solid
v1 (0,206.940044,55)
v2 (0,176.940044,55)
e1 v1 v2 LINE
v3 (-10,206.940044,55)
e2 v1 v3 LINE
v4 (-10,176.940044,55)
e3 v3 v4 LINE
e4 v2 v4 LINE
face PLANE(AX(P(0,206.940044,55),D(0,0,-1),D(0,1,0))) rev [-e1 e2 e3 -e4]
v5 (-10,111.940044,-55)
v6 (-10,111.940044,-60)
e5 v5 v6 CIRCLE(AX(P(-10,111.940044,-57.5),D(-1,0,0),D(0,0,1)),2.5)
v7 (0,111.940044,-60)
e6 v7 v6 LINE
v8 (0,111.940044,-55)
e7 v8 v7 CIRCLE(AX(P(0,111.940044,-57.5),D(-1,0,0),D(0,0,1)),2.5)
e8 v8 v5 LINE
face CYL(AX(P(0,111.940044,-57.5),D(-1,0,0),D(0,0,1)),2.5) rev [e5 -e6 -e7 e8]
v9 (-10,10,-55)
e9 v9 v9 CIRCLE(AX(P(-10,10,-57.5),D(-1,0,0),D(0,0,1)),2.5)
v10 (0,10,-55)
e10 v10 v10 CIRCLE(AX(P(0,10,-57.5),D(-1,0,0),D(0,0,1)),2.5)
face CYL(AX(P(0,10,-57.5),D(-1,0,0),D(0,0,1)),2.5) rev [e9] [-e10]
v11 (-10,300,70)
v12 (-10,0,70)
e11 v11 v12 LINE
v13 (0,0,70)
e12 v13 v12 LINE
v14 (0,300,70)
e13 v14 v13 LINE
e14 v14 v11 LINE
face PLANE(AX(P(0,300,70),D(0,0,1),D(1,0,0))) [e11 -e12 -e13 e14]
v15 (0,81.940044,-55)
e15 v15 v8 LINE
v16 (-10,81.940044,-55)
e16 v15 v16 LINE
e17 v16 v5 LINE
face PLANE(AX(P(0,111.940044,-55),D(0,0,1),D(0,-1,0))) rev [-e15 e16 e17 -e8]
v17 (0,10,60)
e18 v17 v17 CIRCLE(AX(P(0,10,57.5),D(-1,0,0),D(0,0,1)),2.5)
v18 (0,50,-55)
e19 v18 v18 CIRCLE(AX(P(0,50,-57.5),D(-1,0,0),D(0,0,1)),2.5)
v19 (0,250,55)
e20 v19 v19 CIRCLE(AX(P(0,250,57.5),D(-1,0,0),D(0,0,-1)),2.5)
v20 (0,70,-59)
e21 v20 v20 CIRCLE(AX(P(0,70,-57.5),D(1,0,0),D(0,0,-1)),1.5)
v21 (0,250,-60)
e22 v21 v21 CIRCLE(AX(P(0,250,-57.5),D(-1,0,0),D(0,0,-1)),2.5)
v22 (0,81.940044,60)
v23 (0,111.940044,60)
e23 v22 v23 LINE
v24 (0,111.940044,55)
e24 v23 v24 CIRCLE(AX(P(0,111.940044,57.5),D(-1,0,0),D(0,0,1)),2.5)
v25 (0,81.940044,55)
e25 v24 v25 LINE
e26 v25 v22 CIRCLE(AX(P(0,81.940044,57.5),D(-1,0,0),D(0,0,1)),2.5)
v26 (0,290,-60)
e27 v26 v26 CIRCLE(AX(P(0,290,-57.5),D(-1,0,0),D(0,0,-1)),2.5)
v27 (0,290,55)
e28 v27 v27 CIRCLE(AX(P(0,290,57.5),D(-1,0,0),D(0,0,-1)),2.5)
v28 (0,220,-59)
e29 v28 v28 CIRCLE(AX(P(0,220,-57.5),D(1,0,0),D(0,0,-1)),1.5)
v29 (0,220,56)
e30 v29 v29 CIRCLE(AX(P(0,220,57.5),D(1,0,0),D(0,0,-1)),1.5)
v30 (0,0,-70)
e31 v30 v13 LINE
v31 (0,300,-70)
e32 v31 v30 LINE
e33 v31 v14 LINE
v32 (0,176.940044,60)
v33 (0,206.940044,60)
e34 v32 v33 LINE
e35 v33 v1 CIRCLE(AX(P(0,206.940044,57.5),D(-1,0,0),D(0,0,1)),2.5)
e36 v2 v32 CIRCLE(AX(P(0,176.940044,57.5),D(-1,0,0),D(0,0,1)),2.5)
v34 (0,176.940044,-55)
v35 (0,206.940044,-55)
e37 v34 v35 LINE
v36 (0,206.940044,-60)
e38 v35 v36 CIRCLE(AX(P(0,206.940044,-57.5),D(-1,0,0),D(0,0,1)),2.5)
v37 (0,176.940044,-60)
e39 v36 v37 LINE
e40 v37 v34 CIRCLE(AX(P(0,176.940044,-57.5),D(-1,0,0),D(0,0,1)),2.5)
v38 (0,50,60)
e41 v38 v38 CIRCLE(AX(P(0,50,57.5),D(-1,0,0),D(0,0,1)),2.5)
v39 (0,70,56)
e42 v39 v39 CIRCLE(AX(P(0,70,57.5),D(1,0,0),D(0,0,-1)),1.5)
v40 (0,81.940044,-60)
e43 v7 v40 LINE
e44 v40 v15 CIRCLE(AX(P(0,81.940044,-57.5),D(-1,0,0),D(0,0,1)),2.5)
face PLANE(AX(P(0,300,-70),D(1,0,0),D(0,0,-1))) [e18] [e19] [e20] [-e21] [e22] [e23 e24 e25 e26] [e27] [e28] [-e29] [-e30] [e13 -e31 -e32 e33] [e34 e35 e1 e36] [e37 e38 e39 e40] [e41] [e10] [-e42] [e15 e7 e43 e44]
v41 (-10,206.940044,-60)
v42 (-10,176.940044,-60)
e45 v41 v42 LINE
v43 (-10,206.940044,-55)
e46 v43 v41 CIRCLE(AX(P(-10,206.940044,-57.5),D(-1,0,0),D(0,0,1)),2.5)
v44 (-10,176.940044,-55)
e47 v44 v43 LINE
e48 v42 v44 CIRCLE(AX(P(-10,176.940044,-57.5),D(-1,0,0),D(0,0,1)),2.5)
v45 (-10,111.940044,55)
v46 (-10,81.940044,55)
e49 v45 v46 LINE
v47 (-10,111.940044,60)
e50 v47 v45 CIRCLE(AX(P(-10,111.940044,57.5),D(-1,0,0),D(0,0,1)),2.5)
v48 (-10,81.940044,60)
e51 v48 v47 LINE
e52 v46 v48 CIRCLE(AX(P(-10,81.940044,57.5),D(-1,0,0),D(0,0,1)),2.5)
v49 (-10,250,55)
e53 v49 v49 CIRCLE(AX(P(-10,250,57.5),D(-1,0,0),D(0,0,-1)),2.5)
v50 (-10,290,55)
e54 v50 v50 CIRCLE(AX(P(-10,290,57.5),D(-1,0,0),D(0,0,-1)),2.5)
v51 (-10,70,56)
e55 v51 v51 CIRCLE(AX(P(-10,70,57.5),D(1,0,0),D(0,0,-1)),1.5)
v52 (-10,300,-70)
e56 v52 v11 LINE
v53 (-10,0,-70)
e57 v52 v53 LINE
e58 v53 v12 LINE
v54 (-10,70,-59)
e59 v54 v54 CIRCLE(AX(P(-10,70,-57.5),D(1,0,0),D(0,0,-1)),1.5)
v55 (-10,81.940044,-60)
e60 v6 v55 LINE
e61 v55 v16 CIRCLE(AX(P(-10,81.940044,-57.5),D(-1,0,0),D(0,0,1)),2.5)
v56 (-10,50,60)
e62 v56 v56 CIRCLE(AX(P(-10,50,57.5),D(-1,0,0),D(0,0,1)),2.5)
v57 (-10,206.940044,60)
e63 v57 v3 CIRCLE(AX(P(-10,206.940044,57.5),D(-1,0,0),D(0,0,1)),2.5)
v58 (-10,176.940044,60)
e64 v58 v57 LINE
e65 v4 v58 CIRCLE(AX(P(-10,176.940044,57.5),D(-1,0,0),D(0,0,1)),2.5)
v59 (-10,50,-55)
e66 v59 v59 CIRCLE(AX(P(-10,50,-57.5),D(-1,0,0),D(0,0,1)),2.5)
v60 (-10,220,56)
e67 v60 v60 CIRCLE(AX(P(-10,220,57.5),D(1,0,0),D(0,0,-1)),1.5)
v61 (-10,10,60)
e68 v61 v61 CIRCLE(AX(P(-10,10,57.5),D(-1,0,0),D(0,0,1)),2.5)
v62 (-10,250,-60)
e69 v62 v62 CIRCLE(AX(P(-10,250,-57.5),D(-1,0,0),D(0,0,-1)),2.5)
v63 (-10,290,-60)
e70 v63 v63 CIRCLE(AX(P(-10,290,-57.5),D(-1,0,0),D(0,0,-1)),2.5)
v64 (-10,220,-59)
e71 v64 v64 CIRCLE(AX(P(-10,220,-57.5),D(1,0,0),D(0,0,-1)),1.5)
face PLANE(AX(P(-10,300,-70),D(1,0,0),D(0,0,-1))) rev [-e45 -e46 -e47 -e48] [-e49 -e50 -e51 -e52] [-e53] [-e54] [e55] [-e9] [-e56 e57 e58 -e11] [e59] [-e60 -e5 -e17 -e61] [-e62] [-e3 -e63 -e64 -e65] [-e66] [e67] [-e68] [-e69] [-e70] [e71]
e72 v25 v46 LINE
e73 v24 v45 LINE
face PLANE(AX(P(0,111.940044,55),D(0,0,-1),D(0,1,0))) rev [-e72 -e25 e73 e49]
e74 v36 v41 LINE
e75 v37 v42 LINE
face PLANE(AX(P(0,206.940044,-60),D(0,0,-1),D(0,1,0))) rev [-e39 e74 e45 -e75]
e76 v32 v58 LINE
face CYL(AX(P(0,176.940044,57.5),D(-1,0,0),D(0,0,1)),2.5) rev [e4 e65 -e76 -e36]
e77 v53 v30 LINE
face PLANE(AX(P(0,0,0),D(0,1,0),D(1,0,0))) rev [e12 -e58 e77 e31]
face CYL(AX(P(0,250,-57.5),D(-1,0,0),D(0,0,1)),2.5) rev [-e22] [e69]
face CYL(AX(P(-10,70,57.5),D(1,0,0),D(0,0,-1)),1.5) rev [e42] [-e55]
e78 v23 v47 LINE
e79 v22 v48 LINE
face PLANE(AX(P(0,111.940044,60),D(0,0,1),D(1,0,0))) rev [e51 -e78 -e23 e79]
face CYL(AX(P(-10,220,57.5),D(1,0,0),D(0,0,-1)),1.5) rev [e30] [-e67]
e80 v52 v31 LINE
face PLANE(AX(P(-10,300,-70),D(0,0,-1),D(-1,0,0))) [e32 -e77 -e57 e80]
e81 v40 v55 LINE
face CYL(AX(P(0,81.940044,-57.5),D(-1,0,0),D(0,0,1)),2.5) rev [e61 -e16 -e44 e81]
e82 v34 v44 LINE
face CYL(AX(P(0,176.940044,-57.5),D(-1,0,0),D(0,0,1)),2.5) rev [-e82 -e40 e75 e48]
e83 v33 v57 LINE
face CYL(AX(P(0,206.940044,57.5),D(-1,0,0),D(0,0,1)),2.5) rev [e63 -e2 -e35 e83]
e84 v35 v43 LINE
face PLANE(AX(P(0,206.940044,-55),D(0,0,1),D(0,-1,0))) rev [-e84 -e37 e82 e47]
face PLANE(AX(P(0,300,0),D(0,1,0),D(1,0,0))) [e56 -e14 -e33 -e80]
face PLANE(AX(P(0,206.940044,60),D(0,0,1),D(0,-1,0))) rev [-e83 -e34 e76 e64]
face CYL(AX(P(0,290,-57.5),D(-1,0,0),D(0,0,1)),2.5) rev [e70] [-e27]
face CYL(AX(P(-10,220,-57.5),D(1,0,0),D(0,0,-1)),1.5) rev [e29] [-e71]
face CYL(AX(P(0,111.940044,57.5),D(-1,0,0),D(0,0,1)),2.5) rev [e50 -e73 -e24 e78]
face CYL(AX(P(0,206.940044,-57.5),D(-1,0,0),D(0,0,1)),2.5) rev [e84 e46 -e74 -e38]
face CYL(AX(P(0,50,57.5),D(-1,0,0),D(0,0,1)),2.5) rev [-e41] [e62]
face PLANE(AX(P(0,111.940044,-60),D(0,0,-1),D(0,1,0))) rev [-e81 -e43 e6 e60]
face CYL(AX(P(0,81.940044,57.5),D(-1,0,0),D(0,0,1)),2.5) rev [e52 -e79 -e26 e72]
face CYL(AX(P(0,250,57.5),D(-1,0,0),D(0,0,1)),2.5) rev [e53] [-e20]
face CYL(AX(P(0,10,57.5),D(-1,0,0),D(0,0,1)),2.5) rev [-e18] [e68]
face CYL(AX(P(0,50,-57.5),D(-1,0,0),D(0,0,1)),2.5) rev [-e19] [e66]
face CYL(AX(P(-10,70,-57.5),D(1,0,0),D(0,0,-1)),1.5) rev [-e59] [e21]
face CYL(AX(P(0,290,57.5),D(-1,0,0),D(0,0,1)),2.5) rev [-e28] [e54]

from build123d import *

# Parameters (mm, degrees)
BASE_FLANGE1_OUTLINE_W = 10
BASE_FLANGE1_OUTLINE_H = 140
BASE_FLANGE1_DEPTH     = 300
SKETCH6_R              = 2.5
CUT_EXTRUDE1_DEPTH     = 10
SKETCH11_R             = 1.5
CUT_EXTRUDE2_DEPTH     = 10
CUT_EXTRUDE3_DEPTH     = 10


# Read off the part's stored shape, not the designer's step: Base-Flange1
with BuildPart() as part:
    # Base-Flange1 outline → Base-Flange1 (new body)
    with BuildSketch(Plane(origin=(0, 0, 0), x_dir=(1, 0, 0), z_dir=(0, 1, 0))):
        with Locations((-5, 0)):
            Rectangle(BASE_FLANGE1_OUTLINE_W, BASE_FLANGE1_OUTLINE_H)
    extrude(amount=BASE_FLANGE1_DEPTH)

    # Sketch6 → Cut-Extrude1 (cut)
    with BuildSketch(Plane.ZY.offset(10)):
        with Locations((57.5, 10)):
            Circle(SKETCH6_R)
        with Locations((-57.5, 10)):
            Circle(SKETCH6_R)
        with Locations((-57.5, 50)):
            Circle(SKETCH6_R)
        with Locations((57.5, 50)):
            Circle(SKETCH6_R)
        with Locations(Location((57.5, 250, 0), (0, 0, 180))):
            Circle(SKETCH6_R)
        with Locations(Location((-57.5, 250, 0), (0, 0, 180))):
            Circle(SKETCH6_R)
        with Locations(Location((-57.5, 290, 0), (0, 0, 180))):
            Circle(SKETCH6_R)
        with Locations(Location((57.5, 290, 0), (0, 0, 180))):
            Circle(SKETCH6_R)
    extrude(amount=-CUT_EXTRUDE1_DEPTH, mode=Mode.SUBTRACT)

    # Sketch11 → Cut-Extrude2 (cut)
    with BuildSketch(Plane(origin=(0, 0, 0), x_dir=(0, 0, -1), z_dir=(1, 0, 0))):
        with Locations((57.5, 220)):
            Circle(SKETCH11_R)
        with Locations((-57.5, 220)):
            Circle(SKETCH11_R)
        with Locations((-57.5, 70)):
            Circle(SKETCH11_R)
        with Locations((57.5, 70)):
            Circle(SKETCH11_R)
    extrude(amount=-CUT_EXTRUDE2_DEPTH, mode=Mode.SUBTRACT)

    # Sketch12 → Cut-Extrude3 (cut)
    with BuildSketch(Plane.ZY.offset(10)):
        with BuildLine():
            Line((60, 206.940043573), (60, 176.940043573))
            ThreePointArc((60, 176.940043573), (57.5, 174.440043573), (55, 176.940043573))
            Line((55, 176.940043573), (55, 206.940043573))
            ThreePointArc((55, 206.940043573), (57.5, 209.440043573), (60, 206.940043573))
        make_face()
        with BuildLine():
            Line((-55, 206.940043573), (-55, 176.940043573))
            ThreePointArc((-55, 176.940043573), (-57.5, 174.440043573), (-60, 176.940043573))
            Line((-60, 176.940043573), (-60, 206.940043573))
            ThreePointArc((-60, 206.940043573), (-57.5, 209.440043573), (-55, 206.940043573))
        make_face()
        with BuildLine():
            Line((-55, 111.940043573), (-55, 81.940043573))
            ThreePointArc((-55, 81.940043573), (-57.5, 79.440043573), (-60, 81.940043573))
            Line((-60, 81.940043573), (-60, 111.940043573))
            ThreePointArc((-60, 111.940043573), (-57.5, 114.440043573), (-55, 111.940043573))
        make_face()
        with BuildLine():
            Line((60, 111.940043573), (60, 81.940043573))
            ThreePointArc((60, 81.940043573), (57.5, 79.440043573), (55, 81.940043573))
            Line((55, 81.940043573), (55, 111.940043573))
            ThreePointArc((55, 111.940043573), (57.5, 114.440043573), (60, 111.940043573))
        make_face()
    extrude(amount=-CUT_EXTRUDE3_DEPTH, mode=Mode.SUBTRACT)


solid = part.part
